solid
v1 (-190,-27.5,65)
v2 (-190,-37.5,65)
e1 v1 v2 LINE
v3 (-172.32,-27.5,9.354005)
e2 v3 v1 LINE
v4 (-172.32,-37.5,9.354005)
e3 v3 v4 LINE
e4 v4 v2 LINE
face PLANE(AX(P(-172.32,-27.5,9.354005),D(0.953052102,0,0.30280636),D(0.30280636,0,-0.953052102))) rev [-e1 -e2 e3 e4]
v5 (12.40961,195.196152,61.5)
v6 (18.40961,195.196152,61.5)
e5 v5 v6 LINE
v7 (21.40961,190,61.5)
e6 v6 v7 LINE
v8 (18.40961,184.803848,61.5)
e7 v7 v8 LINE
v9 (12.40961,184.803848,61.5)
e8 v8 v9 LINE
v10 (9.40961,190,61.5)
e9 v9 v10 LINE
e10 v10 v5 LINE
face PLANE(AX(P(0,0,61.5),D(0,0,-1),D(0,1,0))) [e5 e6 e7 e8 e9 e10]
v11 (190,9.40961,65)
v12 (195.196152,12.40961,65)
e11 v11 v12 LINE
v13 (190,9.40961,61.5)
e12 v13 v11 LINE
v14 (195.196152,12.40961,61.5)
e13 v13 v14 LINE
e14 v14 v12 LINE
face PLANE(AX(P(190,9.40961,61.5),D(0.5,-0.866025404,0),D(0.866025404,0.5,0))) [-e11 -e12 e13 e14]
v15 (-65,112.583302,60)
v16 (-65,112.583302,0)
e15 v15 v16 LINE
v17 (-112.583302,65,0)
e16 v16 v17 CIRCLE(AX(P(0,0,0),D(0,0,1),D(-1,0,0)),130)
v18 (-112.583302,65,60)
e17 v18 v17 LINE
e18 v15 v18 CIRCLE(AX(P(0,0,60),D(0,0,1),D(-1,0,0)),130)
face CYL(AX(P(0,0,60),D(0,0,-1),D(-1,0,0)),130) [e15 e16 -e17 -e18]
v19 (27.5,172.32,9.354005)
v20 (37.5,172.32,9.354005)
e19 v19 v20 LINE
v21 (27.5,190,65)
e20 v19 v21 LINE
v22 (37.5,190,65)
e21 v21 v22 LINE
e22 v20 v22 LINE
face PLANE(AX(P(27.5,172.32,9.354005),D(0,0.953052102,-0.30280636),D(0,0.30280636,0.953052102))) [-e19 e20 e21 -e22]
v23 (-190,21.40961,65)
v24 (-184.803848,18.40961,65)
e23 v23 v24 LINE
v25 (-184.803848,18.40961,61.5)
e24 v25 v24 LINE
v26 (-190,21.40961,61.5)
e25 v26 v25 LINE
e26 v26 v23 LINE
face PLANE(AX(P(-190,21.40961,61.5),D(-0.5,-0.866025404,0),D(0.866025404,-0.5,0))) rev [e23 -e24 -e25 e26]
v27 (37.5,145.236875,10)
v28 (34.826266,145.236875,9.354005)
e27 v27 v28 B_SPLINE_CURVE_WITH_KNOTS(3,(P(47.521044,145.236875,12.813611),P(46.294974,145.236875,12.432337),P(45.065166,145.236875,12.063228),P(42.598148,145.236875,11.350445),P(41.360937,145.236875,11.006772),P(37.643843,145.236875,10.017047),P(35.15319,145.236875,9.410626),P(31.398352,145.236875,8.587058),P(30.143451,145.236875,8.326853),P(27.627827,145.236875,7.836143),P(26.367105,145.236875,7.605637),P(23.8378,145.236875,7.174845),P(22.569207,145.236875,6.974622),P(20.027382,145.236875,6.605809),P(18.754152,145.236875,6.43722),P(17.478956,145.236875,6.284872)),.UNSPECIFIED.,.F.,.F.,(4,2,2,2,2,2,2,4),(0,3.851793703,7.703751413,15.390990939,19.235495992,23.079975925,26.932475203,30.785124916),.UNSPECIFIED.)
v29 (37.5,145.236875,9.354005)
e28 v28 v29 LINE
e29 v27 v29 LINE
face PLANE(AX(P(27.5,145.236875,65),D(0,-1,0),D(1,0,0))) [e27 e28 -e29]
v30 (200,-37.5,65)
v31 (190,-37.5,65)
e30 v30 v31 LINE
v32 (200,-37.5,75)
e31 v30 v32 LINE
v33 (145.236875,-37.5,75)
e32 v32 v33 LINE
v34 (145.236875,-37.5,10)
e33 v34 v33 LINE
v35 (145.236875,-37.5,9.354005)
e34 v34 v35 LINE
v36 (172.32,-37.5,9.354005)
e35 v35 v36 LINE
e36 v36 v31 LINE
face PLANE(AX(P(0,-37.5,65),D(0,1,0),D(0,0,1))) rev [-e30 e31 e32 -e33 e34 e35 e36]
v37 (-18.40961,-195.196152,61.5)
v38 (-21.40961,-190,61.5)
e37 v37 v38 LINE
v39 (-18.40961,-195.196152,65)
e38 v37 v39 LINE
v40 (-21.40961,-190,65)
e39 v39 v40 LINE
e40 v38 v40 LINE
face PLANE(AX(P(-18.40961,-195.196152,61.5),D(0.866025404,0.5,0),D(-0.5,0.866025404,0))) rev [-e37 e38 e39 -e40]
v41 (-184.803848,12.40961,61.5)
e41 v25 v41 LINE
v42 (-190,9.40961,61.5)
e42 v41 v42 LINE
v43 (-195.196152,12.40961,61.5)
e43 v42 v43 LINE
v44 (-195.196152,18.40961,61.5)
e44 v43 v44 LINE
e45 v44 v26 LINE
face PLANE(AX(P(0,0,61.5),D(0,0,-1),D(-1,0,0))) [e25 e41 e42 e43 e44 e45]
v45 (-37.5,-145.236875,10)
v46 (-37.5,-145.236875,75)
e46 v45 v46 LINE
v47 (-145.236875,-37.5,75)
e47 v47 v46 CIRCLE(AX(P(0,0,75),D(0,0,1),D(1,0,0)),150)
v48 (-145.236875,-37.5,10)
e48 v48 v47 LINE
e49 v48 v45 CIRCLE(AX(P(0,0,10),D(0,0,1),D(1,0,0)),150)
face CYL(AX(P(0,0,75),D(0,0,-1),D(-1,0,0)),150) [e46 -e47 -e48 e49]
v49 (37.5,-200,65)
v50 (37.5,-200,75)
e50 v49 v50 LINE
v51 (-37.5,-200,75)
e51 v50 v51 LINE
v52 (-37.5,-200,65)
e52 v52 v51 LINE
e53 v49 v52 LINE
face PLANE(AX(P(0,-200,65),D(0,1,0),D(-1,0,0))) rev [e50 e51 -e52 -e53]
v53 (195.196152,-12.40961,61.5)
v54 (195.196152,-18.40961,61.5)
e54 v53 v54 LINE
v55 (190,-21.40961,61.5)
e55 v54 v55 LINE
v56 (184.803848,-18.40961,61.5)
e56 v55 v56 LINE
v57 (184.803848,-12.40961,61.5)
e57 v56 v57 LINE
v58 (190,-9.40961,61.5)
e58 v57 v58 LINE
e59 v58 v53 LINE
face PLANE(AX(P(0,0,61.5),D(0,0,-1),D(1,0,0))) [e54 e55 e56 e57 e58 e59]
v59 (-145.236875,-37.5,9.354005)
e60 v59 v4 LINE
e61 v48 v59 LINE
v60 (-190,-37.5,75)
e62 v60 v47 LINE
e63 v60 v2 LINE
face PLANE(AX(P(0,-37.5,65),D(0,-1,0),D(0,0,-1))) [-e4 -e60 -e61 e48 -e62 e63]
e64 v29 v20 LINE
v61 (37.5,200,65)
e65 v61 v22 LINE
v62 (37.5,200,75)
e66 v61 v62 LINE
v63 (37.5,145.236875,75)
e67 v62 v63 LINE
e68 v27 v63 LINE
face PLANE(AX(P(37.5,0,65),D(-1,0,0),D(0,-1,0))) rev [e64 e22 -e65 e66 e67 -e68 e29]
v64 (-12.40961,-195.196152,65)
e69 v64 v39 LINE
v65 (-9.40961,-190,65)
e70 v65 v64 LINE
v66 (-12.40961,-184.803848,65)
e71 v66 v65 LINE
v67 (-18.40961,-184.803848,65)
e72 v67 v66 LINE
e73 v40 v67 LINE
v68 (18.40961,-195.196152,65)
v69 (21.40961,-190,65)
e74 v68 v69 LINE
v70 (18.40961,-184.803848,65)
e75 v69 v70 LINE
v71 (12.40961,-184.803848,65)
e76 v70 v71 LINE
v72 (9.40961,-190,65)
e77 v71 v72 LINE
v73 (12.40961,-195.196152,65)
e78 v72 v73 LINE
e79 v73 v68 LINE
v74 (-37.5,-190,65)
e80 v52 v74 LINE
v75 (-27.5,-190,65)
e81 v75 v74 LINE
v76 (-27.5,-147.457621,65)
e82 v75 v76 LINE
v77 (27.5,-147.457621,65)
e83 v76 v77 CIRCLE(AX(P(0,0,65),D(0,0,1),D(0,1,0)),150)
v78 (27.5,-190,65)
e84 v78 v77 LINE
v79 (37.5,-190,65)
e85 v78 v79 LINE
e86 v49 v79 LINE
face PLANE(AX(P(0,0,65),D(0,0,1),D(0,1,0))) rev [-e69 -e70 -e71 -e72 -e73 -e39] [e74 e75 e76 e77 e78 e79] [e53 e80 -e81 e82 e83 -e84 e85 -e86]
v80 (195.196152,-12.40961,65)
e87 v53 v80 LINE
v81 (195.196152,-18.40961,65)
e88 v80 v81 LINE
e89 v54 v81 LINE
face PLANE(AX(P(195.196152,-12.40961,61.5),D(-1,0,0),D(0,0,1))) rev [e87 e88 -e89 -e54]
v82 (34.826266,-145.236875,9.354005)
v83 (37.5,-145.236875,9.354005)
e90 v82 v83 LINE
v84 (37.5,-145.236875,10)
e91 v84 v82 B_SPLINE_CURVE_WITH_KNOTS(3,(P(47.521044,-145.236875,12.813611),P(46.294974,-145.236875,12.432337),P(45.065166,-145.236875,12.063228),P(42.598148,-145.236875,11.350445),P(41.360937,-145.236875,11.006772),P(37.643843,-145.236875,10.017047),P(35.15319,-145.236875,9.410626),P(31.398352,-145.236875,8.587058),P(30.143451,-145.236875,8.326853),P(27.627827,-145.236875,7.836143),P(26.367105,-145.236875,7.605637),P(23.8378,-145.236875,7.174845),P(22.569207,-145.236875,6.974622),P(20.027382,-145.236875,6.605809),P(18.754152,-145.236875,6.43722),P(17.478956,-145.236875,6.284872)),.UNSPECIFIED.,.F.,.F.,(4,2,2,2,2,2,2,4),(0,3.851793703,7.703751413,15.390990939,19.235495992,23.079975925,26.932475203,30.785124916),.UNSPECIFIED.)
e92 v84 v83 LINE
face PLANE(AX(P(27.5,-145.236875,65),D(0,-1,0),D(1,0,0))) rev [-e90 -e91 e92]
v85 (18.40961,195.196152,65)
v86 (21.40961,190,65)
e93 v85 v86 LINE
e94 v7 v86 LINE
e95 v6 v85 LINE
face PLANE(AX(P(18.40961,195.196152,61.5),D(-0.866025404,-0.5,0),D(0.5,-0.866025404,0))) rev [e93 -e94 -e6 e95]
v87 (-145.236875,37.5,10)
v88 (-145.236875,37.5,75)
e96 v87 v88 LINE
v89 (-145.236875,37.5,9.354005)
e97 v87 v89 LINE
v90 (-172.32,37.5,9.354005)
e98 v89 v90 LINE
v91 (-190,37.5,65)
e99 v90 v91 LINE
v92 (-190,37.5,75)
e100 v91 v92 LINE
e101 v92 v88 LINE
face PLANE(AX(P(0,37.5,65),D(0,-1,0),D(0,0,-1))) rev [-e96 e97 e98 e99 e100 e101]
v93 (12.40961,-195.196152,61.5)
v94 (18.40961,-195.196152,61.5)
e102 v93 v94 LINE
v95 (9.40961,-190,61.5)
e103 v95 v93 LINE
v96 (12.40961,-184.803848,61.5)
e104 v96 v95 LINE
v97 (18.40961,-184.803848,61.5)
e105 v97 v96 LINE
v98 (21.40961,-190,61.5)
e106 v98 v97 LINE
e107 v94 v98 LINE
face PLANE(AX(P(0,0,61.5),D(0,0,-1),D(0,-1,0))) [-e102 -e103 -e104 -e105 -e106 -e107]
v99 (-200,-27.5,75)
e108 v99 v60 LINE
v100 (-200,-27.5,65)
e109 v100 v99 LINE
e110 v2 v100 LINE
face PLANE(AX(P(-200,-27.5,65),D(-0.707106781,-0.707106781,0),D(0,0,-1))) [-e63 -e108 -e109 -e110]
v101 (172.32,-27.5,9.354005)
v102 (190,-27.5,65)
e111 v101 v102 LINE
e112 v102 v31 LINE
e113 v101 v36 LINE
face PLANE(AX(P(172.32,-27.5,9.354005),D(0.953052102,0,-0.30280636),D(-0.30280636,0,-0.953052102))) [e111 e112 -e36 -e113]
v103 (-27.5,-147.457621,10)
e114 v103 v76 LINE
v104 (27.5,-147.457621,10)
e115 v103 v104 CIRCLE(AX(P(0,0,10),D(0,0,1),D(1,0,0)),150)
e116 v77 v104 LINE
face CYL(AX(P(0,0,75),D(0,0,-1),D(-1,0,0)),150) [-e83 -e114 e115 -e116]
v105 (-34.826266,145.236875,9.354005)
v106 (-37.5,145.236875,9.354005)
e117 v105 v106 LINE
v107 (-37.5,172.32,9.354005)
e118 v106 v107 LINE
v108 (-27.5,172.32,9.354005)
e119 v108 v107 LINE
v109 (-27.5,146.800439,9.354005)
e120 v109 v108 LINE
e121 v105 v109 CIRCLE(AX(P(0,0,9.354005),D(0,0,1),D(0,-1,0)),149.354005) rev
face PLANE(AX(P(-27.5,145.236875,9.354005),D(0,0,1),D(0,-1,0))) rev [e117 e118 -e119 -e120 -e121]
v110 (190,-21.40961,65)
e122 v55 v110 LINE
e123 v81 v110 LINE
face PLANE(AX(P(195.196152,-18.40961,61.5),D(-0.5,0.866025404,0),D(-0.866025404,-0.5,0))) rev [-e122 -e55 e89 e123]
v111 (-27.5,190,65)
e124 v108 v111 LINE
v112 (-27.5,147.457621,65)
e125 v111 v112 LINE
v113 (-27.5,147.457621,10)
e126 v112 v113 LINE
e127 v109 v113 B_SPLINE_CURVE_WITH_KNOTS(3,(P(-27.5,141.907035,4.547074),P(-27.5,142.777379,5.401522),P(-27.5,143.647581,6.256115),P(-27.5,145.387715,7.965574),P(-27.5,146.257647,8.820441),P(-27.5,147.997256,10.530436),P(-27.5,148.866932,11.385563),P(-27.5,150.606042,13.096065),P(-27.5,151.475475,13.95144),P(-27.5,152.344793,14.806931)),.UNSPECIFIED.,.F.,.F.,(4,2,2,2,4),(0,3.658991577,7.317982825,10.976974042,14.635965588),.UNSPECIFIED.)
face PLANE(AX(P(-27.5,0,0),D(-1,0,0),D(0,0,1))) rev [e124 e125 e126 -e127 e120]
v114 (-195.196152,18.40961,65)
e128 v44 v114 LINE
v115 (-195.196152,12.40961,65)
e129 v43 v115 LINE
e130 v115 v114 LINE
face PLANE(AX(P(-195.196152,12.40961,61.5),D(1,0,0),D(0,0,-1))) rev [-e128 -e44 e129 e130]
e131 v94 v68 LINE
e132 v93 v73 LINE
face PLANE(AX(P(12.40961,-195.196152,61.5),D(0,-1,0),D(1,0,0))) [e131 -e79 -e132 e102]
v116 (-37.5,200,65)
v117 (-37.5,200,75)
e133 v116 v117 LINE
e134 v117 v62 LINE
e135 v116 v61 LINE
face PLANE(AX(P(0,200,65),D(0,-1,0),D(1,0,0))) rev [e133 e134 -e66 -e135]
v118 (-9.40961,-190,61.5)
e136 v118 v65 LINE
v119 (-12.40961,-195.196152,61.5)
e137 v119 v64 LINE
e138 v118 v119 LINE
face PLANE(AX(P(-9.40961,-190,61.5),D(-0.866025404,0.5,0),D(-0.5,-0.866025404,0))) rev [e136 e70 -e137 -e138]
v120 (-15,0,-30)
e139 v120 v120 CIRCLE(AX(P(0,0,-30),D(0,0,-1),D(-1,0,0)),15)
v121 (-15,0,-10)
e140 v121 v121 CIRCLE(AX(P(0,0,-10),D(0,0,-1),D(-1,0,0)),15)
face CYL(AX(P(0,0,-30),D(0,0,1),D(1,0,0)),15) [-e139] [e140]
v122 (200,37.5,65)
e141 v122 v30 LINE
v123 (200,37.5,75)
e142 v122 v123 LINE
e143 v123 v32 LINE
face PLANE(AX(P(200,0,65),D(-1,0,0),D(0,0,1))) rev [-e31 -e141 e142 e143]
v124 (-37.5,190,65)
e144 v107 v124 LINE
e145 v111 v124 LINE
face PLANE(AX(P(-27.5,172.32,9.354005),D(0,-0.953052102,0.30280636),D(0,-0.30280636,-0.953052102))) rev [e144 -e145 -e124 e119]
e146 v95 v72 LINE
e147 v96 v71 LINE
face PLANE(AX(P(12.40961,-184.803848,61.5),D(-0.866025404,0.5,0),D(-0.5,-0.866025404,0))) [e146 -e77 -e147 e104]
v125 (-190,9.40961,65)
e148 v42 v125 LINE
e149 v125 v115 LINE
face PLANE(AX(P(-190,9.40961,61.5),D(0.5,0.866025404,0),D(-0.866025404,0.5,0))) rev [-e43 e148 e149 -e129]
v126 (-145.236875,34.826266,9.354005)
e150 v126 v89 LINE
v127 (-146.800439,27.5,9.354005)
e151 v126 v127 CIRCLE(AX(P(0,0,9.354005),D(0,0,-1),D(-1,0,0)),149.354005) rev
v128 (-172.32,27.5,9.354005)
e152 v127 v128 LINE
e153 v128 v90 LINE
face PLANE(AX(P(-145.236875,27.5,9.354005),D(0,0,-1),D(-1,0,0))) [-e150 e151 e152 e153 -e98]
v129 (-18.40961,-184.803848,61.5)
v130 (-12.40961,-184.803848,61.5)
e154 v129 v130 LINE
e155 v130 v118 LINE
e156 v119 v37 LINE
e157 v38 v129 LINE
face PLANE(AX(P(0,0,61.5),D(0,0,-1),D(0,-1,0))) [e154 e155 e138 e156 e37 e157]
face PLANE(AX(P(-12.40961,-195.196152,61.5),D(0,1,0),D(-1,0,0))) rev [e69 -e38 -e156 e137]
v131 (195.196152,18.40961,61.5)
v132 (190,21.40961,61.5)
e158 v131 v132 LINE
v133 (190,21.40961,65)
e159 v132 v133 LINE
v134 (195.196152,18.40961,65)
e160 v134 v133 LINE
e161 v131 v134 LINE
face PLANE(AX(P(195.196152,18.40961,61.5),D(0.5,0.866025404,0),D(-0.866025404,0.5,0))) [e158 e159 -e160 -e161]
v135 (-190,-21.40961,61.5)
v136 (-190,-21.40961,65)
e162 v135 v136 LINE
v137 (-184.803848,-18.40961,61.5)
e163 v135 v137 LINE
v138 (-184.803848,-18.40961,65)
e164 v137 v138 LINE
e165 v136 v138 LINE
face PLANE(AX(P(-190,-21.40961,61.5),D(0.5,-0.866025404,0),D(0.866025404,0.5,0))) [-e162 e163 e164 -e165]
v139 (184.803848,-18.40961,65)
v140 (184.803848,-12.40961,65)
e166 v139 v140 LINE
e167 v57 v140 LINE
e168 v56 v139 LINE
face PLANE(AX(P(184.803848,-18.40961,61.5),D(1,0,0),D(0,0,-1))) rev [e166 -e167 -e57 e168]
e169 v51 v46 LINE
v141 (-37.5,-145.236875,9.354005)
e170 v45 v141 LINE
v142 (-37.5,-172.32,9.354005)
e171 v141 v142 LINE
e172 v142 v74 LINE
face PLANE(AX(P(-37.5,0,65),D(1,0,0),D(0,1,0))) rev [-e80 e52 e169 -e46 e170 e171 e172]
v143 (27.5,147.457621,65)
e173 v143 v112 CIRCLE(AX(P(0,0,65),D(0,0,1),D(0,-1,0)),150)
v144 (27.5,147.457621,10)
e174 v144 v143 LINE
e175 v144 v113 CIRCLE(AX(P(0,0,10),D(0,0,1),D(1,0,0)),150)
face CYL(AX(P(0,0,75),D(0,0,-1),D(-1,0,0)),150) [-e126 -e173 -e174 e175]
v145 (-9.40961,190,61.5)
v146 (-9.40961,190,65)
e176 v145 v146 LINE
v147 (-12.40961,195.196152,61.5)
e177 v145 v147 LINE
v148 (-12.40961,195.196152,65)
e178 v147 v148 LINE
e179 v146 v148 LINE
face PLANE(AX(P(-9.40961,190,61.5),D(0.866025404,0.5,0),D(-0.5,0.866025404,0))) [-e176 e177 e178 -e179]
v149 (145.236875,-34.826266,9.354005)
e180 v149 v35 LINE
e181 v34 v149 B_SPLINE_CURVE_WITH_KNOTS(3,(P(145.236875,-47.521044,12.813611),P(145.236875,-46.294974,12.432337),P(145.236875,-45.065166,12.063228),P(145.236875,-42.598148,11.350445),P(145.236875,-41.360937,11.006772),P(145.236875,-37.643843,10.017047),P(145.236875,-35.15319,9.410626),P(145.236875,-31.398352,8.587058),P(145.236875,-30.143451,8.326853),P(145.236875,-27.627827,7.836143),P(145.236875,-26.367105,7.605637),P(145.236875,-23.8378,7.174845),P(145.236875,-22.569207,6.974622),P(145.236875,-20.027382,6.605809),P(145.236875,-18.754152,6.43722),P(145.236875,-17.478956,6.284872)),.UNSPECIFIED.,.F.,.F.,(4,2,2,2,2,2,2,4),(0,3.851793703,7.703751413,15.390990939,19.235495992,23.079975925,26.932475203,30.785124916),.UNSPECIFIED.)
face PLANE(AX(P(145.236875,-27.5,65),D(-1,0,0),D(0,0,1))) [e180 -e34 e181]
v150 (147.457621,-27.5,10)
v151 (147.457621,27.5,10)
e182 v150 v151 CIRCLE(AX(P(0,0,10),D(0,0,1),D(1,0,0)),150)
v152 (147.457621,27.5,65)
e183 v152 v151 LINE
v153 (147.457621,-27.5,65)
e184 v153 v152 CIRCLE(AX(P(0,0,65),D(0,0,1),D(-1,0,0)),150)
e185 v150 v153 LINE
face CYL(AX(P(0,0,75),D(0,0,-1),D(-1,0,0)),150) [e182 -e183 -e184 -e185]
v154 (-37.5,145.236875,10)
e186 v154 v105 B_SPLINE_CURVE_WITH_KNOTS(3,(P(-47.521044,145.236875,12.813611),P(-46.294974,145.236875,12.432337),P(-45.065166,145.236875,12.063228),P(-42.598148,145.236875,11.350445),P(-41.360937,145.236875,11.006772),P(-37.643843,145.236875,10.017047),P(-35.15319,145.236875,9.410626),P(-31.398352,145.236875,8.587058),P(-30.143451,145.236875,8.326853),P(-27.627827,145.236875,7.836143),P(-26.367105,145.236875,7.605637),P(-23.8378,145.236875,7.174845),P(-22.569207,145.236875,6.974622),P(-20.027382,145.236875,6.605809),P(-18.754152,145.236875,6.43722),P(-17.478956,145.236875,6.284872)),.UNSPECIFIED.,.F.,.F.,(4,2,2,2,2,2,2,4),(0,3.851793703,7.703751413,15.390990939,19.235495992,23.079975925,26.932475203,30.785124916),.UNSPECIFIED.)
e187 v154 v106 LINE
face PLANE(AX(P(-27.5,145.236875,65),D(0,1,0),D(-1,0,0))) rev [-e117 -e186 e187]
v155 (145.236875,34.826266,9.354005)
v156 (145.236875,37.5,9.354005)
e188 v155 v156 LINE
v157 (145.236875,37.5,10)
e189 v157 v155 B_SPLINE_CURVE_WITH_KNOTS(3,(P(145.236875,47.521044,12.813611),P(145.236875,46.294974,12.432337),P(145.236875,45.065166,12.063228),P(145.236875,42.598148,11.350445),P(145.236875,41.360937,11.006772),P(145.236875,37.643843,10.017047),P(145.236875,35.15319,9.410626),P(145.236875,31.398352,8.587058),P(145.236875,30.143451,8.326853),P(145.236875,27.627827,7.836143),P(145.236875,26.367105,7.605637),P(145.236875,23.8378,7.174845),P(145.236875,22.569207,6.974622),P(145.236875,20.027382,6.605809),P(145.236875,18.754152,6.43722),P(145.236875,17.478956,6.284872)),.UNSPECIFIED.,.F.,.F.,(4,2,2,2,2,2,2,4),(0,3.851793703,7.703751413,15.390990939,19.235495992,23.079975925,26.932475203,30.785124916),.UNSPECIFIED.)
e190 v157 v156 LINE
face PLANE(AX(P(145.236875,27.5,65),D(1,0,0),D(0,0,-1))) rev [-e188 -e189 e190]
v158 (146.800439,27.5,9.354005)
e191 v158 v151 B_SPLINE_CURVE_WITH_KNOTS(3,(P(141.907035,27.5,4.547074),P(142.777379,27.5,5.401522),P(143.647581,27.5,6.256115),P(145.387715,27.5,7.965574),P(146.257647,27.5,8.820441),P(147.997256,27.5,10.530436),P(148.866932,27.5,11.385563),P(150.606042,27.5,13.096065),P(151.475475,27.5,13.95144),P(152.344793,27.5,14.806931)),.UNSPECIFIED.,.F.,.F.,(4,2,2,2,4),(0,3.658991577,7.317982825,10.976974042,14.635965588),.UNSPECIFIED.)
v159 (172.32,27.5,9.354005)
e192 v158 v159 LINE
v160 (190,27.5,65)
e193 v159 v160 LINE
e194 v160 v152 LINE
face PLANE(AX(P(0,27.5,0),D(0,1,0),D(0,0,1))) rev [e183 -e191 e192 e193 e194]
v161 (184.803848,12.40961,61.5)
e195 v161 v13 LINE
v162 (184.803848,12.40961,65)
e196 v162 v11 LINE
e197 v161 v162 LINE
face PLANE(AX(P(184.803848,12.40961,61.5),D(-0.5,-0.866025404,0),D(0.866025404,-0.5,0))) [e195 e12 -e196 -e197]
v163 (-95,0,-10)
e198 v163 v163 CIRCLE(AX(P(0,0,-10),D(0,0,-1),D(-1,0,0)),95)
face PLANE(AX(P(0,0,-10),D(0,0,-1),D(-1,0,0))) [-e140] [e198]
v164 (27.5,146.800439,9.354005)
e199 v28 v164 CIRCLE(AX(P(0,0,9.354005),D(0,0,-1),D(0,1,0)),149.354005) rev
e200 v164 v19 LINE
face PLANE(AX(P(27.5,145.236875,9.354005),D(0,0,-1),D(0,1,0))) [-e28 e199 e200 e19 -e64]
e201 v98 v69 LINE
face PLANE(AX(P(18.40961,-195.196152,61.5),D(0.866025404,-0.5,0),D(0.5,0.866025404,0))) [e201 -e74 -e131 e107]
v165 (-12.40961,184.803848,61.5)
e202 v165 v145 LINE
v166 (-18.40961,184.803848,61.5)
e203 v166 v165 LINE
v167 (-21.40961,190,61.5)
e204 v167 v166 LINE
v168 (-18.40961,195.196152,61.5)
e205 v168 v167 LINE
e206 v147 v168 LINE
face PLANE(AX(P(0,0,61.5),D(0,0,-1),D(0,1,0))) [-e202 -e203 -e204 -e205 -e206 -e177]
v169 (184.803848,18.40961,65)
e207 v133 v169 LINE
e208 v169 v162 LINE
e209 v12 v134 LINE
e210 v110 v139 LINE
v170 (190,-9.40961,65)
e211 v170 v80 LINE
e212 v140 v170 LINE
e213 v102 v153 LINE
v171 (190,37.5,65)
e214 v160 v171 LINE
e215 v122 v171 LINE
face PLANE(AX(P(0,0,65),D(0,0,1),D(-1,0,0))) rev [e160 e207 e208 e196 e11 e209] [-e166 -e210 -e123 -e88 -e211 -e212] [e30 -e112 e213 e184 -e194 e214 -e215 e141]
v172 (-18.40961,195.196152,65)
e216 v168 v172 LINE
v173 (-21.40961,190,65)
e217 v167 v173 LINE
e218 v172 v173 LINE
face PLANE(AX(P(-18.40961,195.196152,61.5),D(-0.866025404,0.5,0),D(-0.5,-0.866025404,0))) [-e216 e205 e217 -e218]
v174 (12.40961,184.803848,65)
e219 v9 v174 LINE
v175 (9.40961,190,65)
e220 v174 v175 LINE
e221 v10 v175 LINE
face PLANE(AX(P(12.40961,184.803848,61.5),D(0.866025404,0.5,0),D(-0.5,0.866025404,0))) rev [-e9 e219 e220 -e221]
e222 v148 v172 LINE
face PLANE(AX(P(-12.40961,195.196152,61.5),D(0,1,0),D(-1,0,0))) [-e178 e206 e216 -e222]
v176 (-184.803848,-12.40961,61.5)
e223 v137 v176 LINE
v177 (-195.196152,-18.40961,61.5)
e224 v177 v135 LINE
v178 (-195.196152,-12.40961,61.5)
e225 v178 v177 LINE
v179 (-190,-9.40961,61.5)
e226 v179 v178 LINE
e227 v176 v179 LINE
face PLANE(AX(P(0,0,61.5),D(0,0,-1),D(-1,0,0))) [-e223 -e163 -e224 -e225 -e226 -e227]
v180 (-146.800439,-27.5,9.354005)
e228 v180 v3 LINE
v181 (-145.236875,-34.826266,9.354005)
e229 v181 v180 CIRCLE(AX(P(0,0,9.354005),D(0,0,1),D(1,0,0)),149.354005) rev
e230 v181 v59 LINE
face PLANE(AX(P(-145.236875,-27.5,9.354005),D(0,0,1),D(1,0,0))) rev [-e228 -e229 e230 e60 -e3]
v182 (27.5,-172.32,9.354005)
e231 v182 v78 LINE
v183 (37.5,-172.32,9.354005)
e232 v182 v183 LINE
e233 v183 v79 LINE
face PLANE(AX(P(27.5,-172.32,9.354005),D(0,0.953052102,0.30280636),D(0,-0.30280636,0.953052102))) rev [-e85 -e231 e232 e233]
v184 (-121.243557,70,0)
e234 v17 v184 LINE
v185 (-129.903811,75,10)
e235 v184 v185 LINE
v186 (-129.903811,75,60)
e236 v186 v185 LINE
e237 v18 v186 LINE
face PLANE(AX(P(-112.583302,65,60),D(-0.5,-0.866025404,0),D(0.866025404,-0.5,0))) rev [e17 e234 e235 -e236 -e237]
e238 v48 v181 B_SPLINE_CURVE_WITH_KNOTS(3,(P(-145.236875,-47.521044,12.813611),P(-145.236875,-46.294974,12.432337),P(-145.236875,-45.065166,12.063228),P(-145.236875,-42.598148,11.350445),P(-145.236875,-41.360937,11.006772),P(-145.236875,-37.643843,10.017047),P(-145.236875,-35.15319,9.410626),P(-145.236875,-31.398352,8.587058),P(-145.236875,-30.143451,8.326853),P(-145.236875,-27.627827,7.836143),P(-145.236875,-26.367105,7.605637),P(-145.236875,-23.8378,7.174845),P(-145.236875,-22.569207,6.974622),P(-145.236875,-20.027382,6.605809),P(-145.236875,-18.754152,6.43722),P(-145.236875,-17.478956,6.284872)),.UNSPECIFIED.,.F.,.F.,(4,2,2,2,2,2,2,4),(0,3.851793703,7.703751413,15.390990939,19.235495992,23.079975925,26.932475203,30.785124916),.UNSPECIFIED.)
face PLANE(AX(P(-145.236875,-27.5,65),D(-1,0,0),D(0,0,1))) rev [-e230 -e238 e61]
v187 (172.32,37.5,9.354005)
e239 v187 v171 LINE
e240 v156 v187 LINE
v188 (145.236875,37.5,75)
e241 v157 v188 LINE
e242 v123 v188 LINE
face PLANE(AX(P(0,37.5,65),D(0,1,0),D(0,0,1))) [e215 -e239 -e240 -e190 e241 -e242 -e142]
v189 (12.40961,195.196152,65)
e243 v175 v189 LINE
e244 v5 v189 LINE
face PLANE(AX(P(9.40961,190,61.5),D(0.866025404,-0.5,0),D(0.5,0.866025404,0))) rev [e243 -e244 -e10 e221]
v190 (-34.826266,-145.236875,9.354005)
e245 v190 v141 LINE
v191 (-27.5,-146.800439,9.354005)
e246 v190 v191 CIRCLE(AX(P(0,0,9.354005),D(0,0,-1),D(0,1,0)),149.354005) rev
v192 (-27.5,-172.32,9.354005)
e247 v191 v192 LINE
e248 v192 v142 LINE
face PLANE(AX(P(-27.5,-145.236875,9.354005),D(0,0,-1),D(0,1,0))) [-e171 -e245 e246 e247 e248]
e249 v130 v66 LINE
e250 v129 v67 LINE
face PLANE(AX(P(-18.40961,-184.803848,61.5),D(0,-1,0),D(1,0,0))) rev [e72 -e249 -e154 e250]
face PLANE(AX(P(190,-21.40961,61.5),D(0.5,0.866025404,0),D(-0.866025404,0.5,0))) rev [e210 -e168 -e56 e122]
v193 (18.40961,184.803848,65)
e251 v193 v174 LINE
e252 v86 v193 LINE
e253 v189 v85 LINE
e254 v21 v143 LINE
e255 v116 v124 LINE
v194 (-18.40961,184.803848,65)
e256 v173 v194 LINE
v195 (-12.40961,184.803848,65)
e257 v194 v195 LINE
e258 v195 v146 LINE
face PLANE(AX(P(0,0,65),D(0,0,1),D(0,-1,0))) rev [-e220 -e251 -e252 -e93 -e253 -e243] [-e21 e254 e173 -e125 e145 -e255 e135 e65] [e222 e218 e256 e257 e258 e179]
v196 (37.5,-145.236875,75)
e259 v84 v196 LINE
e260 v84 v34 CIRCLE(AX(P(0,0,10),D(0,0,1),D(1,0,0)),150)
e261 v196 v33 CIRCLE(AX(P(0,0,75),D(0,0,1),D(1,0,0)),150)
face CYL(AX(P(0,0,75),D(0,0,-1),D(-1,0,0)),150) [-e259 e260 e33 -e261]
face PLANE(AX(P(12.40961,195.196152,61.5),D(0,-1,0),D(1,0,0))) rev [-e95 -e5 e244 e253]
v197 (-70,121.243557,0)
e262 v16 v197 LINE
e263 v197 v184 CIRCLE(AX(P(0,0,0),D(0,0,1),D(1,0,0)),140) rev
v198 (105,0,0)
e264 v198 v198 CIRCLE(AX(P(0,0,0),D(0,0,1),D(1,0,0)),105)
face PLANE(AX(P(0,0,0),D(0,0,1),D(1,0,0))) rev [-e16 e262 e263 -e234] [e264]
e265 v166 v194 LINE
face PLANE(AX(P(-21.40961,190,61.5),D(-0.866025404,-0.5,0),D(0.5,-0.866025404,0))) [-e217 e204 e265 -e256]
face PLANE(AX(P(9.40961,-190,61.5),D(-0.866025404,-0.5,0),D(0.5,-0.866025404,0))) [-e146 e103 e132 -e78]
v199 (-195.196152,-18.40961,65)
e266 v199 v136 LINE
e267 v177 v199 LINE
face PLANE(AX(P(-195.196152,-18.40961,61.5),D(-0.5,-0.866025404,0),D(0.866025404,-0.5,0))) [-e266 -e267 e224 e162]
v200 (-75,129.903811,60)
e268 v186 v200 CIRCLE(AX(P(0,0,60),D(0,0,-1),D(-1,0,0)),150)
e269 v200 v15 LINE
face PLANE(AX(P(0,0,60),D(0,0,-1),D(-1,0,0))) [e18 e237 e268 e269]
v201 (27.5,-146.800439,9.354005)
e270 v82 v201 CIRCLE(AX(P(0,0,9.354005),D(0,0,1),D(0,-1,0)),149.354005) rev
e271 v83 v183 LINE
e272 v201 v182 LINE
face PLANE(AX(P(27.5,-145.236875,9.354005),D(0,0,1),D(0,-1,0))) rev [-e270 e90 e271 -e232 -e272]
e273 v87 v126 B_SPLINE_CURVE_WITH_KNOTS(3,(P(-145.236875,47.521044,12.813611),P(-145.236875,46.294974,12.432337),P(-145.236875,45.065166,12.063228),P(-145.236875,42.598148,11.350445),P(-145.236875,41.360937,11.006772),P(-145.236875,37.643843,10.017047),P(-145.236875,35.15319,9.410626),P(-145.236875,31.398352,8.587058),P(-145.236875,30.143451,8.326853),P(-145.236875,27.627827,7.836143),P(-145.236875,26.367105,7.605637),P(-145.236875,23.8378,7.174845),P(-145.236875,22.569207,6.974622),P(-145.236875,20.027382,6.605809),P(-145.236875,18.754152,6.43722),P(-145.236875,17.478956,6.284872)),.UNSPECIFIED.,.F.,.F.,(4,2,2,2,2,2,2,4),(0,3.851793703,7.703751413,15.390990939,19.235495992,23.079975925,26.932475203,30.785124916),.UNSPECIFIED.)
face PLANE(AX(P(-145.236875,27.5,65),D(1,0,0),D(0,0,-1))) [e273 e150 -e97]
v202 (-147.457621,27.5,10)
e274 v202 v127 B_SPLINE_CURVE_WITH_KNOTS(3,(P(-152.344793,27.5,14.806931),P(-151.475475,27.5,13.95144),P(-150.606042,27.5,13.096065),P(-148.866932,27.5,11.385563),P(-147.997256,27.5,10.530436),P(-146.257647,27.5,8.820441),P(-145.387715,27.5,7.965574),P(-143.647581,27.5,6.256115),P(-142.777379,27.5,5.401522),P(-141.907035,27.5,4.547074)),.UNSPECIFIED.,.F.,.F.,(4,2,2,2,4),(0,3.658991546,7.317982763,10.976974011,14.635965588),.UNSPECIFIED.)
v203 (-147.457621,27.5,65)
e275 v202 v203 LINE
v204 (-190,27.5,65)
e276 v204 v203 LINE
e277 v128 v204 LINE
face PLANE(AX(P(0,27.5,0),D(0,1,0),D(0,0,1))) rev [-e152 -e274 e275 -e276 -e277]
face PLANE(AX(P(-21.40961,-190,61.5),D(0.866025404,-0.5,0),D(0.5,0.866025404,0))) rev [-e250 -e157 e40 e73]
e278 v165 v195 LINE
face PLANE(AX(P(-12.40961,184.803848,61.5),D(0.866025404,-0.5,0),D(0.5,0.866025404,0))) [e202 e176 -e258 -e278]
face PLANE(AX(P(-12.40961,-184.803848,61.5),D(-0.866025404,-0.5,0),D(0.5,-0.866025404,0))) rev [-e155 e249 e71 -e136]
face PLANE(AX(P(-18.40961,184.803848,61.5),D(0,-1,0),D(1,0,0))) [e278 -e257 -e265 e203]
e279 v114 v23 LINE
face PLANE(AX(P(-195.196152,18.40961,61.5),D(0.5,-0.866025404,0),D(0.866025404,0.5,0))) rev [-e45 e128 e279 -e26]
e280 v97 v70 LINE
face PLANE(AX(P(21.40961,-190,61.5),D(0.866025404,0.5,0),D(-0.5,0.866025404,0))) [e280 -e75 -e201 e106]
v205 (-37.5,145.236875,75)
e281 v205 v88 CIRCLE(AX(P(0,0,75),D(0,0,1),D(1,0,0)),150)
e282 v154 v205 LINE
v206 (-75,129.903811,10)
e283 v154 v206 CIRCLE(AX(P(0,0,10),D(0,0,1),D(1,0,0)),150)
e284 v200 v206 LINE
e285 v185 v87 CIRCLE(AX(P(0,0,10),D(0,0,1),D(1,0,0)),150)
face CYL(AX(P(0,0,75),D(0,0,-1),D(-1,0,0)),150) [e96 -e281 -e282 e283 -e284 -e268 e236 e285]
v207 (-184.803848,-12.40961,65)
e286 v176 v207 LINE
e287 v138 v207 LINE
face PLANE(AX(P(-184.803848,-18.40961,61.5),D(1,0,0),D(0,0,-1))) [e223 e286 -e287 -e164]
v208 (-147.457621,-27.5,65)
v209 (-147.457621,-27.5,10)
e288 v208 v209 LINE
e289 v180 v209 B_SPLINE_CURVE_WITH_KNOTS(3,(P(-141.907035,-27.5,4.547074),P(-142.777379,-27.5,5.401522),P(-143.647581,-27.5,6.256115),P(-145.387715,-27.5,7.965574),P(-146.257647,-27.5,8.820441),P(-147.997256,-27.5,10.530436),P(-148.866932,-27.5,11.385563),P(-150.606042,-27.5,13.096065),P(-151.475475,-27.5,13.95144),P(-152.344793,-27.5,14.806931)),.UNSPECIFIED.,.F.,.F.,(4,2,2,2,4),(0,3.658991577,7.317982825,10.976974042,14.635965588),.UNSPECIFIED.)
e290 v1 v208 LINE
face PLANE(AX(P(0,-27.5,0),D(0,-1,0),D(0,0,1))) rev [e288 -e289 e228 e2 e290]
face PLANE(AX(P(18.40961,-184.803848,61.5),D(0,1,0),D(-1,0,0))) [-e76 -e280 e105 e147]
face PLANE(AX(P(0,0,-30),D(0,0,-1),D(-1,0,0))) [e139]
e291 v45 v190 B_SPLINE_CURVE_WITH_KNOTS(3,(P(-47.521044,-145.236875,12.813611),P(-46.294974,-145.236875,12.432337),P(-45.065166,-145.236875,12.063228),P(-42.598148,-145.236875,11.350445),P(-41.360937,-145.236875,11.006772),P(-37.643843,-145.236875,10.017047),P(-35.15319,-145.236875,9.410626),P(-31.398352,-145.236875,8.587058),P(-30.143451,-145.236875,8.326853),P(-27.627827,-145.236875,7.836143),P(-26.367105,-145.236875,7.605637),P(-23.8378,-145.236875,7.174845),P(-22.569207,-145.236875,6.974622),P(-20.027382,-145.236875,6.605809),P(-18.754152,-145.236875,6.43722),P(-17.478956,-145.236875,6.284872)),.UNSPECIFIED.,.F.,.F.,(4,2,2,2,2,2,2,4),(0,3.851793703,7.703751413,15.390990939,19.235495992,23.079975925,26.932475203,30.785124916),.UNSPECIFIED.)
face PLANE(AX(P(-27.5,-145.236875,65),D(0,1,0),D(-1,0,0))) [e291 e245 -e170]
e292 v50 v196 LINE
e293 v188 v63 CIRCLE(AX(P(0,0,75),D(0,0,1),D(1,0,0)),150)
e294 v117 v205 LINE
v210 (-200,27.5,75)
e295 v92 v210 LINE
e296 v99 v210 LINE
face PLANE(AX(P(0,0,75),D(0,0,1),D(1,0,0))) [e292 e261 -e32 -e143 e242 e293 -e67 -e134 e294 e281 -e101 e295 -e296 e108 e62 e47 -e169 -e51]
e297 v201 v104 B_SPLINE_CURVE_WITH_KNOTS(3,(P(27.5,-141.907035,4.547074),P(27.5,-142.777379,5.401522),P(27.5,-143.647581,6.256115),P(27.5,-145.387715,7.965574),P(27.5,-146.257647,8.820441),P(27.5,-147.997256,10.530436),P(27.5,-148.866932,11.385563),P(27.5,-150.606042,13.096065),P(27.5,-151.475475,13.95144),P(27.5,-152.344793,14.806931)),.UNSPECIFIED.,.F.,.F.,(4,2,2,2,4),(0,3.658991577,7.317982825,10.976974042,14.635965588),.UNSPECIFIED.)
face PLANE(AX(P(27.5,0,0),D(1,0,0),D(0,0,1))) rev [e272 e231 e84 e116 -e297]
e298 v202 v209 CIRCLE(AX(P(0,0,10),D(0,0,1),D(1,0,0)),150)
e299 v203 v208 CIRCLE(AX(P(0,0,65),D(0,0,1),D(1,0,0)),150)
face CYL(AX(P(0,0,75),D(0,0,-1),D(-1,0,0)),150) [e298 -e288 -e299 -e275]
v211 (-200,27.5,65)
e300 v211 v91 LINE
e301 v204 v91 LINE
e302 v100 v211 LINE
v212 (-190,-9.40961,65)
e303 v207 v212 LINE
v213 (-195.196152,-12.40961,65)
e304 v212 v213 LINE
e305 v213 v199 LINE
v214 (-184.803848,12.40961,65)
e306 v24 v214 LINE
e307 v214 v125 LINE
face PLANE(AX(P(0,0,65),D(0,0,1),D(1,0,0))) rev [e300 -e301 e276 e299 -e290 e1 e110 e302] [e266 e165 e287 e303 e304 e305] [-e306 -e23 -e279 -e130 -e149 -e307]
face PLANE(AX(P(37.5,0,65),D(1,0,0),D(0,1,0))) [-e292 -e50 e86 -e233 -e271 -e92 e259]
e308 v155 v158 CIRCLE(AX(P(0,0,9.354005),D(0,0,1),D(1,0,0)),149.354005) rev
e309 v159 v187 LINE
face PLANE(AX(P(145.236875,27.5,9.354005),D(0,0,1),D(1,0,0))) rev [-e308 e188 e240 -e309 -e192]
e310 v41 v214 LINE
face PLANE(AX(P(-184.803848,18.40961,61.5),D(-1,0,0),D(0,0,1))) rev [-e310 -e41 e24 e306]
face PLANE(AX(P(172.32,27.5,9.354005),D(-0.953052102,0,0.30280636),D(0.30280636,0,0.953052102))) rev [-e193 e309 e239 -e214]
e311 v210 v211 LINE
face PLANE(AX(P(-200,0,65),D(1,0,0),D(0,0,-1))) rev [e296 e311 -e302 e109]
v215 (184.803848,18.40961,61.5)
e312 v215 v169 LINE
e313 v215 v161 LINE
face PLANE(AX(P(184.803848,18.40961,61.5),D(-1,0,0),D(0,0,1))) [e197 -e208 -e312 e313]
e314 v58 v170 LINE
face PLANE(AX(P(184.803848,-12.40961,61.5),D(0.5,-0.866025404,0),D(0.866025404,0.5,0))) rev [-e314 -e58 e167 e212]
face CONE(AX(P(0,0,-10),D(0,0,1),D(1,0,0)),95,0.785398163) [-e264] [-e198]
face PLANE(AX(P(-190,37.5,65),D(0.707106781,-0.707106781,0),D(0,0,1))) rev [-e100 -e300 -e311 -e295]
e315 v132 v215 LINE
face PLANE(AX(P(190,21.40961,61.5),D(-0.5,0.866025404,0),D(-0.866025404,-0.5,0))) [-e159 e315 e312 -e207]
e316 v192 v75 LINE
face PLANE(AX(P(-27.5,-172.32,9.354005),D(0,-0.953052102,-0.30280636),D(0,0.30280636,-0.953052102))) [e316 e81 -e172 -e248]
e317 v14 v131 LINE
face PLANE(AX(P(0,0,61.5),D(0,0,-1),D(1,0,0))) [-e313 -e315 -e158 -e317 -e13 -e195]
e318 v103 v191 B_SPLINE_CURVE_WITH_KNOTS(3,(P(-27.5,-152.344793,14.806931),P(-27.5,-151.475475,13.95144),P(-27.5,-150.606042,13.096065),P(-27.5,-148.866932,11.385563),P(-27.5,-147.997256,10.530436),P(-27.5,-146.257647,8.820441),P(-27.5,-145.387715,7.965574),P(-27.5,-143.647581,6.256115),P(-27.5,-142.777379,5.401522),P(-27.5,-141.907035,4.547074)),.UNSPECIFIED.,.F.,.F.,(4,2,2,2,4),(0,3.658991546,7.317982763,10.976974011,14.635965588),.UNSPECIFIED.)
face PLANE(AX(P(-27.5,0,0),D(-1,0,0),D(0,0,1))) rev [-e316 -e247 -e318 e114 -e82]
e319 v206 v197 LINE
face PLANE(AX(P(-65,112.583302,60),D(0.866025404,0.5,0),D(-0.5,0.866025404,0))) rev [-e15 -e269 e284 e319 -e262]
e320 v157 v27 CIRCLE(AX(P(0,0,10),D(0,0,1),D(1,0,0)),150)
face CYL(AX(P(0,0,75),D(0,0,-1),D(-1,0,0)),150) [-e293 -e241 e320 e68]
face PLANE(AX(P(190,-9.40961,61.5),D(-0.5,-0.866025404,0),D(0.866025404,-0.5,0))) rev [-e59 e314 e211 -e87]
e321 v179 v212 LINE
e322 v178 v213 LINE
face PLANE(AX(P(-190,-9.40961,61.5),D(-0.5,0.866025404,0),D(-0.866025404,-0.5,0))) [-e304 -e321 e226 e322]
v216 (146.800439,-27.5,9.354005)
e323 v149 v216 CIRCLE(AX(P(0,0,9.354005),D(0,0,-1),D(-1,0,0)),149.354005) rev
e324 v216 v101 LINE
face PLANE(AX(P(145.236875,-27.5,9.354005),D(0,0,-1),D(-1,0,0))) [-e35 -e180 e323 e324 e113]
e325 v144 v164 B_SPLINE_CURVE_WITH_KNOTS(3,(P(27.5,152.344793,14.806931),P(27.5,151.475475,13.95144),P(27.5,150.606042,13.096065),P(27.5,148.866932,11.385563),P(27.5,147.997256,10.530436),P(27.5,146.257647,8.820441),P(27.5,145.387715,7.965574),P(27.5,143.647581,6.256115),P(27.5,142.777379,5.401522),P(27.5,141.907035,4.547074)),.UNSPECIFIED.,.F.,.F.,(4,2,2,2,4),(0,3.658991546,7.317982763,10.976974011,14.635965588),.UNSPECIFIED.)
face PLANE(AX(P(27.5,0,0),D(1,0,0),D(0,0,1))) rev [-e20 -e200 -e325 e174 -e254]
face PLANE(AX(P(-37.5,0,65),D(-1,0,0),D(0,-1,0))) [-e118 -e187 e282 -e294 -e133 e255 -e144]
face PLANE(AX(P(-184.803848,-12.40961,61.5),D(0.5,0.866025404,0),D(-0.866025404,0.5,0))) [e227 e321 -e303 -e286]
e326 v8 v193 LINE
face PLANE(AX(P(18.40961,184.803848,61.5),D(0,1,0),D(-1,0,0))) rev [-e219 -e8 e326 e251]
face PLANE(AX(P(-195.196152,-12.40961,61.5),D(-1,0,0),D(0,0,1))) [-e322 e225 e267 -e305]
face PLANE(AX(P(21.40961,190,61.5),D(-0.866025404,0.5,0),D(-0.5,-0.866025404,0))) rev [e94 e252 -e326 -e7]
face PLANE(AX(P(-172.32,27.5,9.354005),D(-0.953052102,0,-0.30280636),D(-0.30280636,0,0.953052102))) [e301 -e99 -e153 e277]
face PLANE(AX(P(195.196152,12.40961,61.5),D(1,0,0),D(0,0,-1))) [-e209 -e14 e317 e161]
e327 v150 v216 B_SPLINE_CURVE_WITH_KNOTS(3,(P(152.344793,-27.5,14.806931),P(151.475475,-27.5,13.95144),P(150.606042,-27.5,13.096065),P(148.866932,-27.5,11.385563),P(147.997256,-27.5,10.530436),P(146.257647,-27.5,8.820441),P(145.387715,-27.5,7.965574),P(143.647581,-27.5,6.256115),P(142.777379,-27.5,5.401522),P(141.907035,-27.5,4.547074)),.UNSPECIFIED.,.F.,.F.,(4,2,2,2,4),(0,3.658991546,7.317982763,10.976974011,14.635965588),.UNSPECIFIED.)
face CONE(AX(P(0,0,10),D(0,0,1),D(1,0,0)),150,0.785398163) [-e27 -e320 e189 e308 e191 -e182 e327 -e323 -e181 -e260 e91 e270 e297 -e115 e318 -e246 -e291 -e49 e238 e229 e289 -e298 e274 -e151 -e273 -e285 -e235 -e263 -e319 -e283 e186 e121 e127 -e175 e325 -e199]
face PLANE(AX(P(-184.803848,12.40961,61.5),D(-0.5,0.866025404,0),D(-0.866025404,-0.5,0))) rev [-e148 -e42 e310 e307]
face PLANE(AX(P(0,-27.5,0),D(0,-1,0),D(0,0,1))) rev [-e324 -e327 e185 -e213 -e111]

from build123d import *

# Parameters (mm, degrees)
SKETCH1_R                = 150
BOSS_EXTRUDE1_DEPTH      = 75
CHAMFER1_SIZE            = 10
BOSS_EXTRUDE2_START      = -10
BOSS_EXTRUDE2_DEPTH      = 10
CHAMFER2_SIZE            = 10
BOSS_EXTRUDE3_DEPTH      = 10
BOSS_EXTRUDE4_DEPTH      = 3.5
CIRPATTERN1_COUNT        = 4
CIRPATTERN1_COPY_1_DEPTH = 10
CIRPATTERN1_COPY_2_DEPTH = 10
CIRPATTERN1_COPY_3_DEPTH = 10
CIRPATTERN1_COPY_4_DEPTH = 3.5
CIRPATTERN1_COPY_5_DEPTH = 3.5
CIRPATTERN1_COPY_6_DEPTH = 3.5
CUT_EXTRUDE1_DEPTH       = 60
SKETCH6_R                = 110
BOSS_EXTRUDE5_DEPTH      = 10
CHAMFER3_SIZE            = 15
SKETCH7_R                = 15
BOSS_EXTRUDE6_DEPTH      = 20


with BuildPart() as part:
    # Sketch1 → Boss-Extrude1 (new body)
    with BuildSketch(Plane(origin=(0, 0, 0), x_dir=(0, 1, 0), z_dir=(0, 0, 1))):
        with Locations(Location((0, 0, 0), (0, 0, 270))):
            Circle(SKETCH1_R)
    extrude(amount=BOSS_EXTRUDE1_DEPTH)

    # Chamfer1
    chamfer1_edges = [part.edges().sort_by_distance(p)[0] for p in [
        (-150, 0, 0),
    ]]
    chamfer(chamfer1_edges, length=CHAMFER1_SIZE)

    # Sketch2 → Boss-Extrude2 (add)
    with BuildSketch(Plane.XY.offset(75).offset(BOSS_EXTRUDE2_START)):
        with BuildLine():
            Line((-200, 37.5), (-200, -37.5))
            Line((-200, -37.5), (-145.236875483, -37.5))
            ThreePointArc((-145.236875483, -37.5), (-150, 0), (-145.236875483, 37.5))
            Line((-145.236875483, 37.5), (-200, 37.5))
        make_face()
    boss_extrude2 = extrude(amount=BOSS_EXTRUDE2_DEPTH)

    # Chamfer2
    chamfer2_edges = [part.edges().sort_by_distance(p)[0] for p in [
        (-200, 37.5, 70),
        (-200, -37.5, 70),
    ]]
    chamfer(chamfer2_edges, length=CHAMFER2_SIZE)

    # Sketch3 → Boss-Extrude3 (add)
    with BuildSketch(Plane(origin=(0, 37.5, 0), x_dir=(-1, 0, 0), z_dir=(0, 1, 0))):
        Polygon((145.236875483, 65), (145.236875483, 9.354005049), (172.32, 9.354005049), (190, 65), align=None)
    boss_extrude3 = extrude(amount=-BOSS_EXTRUDE3_DEPTH)

    # Sketch4 → Boss-Extrude4 (add)
    with BuildSketch(Plane(origin=(0, 0, 65), x_dir=(1, 0, 0), z_dir=(0, 0, -1))):
        Polygon((-190, -9.409610349), (-195.196152423, -12.409610349), (-195.196152423, -18.409610349), (-190, -21.409610349), (-184.803847577, -18.409610349), (-184.803847577, -12.409610349), align=None)
    boss_extrude4 = extrude(amount=BOSS_EXTRUDE4_DEPTH)

    # Mirror1: Boss-Extrude3, Boss-Extrude4 across plane
    add(boss_extrude3.mirror(Plane.ZX))
    add(boss_extrude4.mirror(Plane.ZX))

    # CirPattern1: Boss-Extrude2, Boss-Extrude3, Boss-Extrude4 ×4 about axis
    cirpattern1_axis = Axis((0, 0, 0), (0, 0, 1))
    add([boss_extrude2.rotate(cirpattern1_axis, i * 360 / CIRPATTERN1_COUNT) for i in range(1, CIRPATTERN1_COUNT)])
    add([boss_extrude3.rotate(cirpattern1_axis, i * 360 / CIRPATTERN1_COUNT) for i in range(1, CIRPATTERN1_COUNT)])
    add([boss_extrude4.rotate(cirpattern1_axis, i * 360 / CIRPATTERN1_COUNT) for i in range(1, CIRPATTERN1_COUNT)])

    # CirPattern1 copy 1 sketch → CirPattern1 copy 1 (add)
    with BuildSketch(Plane(origin=(37.5, 0, 0), x_dir=(0, -1, 0), z_dir=(1, 0, 0))):
        Polygon((145.236875483, -65), (145.236875483, -9.354005049), (172.32, -9.354005049), (190, -65), align=None)
    extrude(amount=-CIRPATTERN1_COPY_1_DEPTH)

    # CirPattern1 copy 2 sketch → CirPattern1 copy 2 (add)
    with BuildSketch(Plane(origin=(0, 37.5, 0), x_dir=(1, 0, 0), z_dir=(0, 1, 0))):
        Polygon((145.236875483, -65), (145.236875483, -9.354005049), (172.32, -9.354005049), (190, -65), align=None)
    extrude(amount=-CIRPATTERN1_COPY_2_DEPTH)

    # CirPattern1 copy 3 sketch → CirPattern1 copy 3 (add)
    with BuildSketch(Plane(origin=(-37.5, 0, 0), x_dir=(0, 1, 0), z_dir=(-1, 0, 0))):
        Polygon((145.236875483, -65), (145.236875483, -9.354005049), (172.32, -9.354005049), (190, -65), align=None)
    extrude(amount=-CIRPATTERN1_COPY_3_DEPTH)

    # CirPattern1 copy 4 sketch → CirPattern1 copy 4 (add)
    with BuildSketch(Plane.YX.offset(-65)):
        Polygon((-190, 9.409610349), (-195.196152423, 12.409610349), (-195.196152423, 18.409610349), (-190, 21.409610349), (-184.803847577, 18.409610349), (-184.803847577, 12.409610349), align=None)
    extrude(amount=CIRPATTERN1_COPY_4_DEPTH)

    # CirPattern1 copy 5 sketch → CirPattern1 copy 5 (add)
    with BuildSketch(Plane(origin=(0, 0, 65), x_dir=(-1, 0, 0), z_dir=(0, 0, -1))):
        Polygon((-190, 9.409610349), (-195.196152423, 12.409610349), (-195.196152423, 18.409610349), (-190, 21.409610349), (-184.803847577, 18.409610349), (-184.803847577, 12.409610349), align=None)
    extrude(amount=CIRPATTERN1_COPY_5_DEPTH)

    # CirPattern1 copy 6 sketch → CirPattern1 copy 6 (add)
    with BuildSketch(Plane(origin=(0, 0, 65), x_dir=(0, -1, 0), z_dir=(0, 0, -1))):
        Polygon((-190, 9.409610349), (-195.196152423, 12.409610349), (-195.196152423, 18.409610349), (-190, 21.409610349), (-184.803847577, 18.409610349), (-184.803847577, 12.409610349), align=None)
    extrude(amount=CIRPATTERN1_COPY_6_DEPTH)

    # Sketch5 → Cut-Extrude1 (cut)
    with BuildSketch(Plane(origin=(0, 0, 0), x_dir=(1, 0, 0), z_dir=(0, 0, -1))):
        with BuildLine():
            Line((-112.583302492, -65), (-129.903810568, -75))
            ThreePointArc((-129.903810568, -75), (-106.066017178, -106.066017178), (-75, -129.903810568))
            Line((-75, -129.903810568), (-65, -112.583302492))
            ThreePointArc((-65, -112.583302492), (-91.923881554, -91.923881554), (-112.583302492, -65))
        make_face()
    extrude(amount=-CUT_EXTRUDE1_DEPTH, mode=Mode.SUBTRACT)

    # Sketch6 → Boss-Extrude5 (add)
    with BuildSketch(Plane(origin=(0, 0, 0), x_dir=(1, 0, 0), z_dir=(0, 0, -1))):
        with Locations(Location((0, 0, 0), (0, 0, 180))):
            Circle(SKETCH6_R)
    extrude(amount=BOSS_EXTRUDE5_DEPTH)

    # Chamfer3
    # the kernel refuses this chamfer: 15 mm, written as the material it takes off along each edge
    with BuildSketch(Plane(origin=(0, 0, -10), x_dir=(-1, 0, 0), z_dir=(0, -1, 0))) as chamfer3_piece_1_section:
        Polygon((110, -CHAMFER3_SIZE), (110 - CHAMFER3_SIZE, 0), (110, 0), align=None)
    chamfer3_piece_1 = revolve(axis=Axis((0, 0, -10), (0, 0, -1)), mode=Mode.PRIVATE)
    chamfer3_piece_1 = split(chamfer3_piece_1, bisect_by=Plane(origin=(100.081022807, 0, 0), z_dir=(0, 0, -1)), keep=Keep.TOP, mode=Mode.PRIVATE)
    add(chamfer3_piece_1, mode=Mode.SUBTRACT)

    # Sketch7 → Boss-Extrude6 (add)
    with BuildSketch(Plane(origin=(0, 0, -10), x_dir=(1, 0, 0), z_dir=(0, 0, -1))):
        with Locations(Location((0, 0, 0), (0, 0, 180))):
            Circle(SKETCH7_R)
    extrude(amount=BOSS_EXTRUDE6_DEPTH)


solid = part.part
